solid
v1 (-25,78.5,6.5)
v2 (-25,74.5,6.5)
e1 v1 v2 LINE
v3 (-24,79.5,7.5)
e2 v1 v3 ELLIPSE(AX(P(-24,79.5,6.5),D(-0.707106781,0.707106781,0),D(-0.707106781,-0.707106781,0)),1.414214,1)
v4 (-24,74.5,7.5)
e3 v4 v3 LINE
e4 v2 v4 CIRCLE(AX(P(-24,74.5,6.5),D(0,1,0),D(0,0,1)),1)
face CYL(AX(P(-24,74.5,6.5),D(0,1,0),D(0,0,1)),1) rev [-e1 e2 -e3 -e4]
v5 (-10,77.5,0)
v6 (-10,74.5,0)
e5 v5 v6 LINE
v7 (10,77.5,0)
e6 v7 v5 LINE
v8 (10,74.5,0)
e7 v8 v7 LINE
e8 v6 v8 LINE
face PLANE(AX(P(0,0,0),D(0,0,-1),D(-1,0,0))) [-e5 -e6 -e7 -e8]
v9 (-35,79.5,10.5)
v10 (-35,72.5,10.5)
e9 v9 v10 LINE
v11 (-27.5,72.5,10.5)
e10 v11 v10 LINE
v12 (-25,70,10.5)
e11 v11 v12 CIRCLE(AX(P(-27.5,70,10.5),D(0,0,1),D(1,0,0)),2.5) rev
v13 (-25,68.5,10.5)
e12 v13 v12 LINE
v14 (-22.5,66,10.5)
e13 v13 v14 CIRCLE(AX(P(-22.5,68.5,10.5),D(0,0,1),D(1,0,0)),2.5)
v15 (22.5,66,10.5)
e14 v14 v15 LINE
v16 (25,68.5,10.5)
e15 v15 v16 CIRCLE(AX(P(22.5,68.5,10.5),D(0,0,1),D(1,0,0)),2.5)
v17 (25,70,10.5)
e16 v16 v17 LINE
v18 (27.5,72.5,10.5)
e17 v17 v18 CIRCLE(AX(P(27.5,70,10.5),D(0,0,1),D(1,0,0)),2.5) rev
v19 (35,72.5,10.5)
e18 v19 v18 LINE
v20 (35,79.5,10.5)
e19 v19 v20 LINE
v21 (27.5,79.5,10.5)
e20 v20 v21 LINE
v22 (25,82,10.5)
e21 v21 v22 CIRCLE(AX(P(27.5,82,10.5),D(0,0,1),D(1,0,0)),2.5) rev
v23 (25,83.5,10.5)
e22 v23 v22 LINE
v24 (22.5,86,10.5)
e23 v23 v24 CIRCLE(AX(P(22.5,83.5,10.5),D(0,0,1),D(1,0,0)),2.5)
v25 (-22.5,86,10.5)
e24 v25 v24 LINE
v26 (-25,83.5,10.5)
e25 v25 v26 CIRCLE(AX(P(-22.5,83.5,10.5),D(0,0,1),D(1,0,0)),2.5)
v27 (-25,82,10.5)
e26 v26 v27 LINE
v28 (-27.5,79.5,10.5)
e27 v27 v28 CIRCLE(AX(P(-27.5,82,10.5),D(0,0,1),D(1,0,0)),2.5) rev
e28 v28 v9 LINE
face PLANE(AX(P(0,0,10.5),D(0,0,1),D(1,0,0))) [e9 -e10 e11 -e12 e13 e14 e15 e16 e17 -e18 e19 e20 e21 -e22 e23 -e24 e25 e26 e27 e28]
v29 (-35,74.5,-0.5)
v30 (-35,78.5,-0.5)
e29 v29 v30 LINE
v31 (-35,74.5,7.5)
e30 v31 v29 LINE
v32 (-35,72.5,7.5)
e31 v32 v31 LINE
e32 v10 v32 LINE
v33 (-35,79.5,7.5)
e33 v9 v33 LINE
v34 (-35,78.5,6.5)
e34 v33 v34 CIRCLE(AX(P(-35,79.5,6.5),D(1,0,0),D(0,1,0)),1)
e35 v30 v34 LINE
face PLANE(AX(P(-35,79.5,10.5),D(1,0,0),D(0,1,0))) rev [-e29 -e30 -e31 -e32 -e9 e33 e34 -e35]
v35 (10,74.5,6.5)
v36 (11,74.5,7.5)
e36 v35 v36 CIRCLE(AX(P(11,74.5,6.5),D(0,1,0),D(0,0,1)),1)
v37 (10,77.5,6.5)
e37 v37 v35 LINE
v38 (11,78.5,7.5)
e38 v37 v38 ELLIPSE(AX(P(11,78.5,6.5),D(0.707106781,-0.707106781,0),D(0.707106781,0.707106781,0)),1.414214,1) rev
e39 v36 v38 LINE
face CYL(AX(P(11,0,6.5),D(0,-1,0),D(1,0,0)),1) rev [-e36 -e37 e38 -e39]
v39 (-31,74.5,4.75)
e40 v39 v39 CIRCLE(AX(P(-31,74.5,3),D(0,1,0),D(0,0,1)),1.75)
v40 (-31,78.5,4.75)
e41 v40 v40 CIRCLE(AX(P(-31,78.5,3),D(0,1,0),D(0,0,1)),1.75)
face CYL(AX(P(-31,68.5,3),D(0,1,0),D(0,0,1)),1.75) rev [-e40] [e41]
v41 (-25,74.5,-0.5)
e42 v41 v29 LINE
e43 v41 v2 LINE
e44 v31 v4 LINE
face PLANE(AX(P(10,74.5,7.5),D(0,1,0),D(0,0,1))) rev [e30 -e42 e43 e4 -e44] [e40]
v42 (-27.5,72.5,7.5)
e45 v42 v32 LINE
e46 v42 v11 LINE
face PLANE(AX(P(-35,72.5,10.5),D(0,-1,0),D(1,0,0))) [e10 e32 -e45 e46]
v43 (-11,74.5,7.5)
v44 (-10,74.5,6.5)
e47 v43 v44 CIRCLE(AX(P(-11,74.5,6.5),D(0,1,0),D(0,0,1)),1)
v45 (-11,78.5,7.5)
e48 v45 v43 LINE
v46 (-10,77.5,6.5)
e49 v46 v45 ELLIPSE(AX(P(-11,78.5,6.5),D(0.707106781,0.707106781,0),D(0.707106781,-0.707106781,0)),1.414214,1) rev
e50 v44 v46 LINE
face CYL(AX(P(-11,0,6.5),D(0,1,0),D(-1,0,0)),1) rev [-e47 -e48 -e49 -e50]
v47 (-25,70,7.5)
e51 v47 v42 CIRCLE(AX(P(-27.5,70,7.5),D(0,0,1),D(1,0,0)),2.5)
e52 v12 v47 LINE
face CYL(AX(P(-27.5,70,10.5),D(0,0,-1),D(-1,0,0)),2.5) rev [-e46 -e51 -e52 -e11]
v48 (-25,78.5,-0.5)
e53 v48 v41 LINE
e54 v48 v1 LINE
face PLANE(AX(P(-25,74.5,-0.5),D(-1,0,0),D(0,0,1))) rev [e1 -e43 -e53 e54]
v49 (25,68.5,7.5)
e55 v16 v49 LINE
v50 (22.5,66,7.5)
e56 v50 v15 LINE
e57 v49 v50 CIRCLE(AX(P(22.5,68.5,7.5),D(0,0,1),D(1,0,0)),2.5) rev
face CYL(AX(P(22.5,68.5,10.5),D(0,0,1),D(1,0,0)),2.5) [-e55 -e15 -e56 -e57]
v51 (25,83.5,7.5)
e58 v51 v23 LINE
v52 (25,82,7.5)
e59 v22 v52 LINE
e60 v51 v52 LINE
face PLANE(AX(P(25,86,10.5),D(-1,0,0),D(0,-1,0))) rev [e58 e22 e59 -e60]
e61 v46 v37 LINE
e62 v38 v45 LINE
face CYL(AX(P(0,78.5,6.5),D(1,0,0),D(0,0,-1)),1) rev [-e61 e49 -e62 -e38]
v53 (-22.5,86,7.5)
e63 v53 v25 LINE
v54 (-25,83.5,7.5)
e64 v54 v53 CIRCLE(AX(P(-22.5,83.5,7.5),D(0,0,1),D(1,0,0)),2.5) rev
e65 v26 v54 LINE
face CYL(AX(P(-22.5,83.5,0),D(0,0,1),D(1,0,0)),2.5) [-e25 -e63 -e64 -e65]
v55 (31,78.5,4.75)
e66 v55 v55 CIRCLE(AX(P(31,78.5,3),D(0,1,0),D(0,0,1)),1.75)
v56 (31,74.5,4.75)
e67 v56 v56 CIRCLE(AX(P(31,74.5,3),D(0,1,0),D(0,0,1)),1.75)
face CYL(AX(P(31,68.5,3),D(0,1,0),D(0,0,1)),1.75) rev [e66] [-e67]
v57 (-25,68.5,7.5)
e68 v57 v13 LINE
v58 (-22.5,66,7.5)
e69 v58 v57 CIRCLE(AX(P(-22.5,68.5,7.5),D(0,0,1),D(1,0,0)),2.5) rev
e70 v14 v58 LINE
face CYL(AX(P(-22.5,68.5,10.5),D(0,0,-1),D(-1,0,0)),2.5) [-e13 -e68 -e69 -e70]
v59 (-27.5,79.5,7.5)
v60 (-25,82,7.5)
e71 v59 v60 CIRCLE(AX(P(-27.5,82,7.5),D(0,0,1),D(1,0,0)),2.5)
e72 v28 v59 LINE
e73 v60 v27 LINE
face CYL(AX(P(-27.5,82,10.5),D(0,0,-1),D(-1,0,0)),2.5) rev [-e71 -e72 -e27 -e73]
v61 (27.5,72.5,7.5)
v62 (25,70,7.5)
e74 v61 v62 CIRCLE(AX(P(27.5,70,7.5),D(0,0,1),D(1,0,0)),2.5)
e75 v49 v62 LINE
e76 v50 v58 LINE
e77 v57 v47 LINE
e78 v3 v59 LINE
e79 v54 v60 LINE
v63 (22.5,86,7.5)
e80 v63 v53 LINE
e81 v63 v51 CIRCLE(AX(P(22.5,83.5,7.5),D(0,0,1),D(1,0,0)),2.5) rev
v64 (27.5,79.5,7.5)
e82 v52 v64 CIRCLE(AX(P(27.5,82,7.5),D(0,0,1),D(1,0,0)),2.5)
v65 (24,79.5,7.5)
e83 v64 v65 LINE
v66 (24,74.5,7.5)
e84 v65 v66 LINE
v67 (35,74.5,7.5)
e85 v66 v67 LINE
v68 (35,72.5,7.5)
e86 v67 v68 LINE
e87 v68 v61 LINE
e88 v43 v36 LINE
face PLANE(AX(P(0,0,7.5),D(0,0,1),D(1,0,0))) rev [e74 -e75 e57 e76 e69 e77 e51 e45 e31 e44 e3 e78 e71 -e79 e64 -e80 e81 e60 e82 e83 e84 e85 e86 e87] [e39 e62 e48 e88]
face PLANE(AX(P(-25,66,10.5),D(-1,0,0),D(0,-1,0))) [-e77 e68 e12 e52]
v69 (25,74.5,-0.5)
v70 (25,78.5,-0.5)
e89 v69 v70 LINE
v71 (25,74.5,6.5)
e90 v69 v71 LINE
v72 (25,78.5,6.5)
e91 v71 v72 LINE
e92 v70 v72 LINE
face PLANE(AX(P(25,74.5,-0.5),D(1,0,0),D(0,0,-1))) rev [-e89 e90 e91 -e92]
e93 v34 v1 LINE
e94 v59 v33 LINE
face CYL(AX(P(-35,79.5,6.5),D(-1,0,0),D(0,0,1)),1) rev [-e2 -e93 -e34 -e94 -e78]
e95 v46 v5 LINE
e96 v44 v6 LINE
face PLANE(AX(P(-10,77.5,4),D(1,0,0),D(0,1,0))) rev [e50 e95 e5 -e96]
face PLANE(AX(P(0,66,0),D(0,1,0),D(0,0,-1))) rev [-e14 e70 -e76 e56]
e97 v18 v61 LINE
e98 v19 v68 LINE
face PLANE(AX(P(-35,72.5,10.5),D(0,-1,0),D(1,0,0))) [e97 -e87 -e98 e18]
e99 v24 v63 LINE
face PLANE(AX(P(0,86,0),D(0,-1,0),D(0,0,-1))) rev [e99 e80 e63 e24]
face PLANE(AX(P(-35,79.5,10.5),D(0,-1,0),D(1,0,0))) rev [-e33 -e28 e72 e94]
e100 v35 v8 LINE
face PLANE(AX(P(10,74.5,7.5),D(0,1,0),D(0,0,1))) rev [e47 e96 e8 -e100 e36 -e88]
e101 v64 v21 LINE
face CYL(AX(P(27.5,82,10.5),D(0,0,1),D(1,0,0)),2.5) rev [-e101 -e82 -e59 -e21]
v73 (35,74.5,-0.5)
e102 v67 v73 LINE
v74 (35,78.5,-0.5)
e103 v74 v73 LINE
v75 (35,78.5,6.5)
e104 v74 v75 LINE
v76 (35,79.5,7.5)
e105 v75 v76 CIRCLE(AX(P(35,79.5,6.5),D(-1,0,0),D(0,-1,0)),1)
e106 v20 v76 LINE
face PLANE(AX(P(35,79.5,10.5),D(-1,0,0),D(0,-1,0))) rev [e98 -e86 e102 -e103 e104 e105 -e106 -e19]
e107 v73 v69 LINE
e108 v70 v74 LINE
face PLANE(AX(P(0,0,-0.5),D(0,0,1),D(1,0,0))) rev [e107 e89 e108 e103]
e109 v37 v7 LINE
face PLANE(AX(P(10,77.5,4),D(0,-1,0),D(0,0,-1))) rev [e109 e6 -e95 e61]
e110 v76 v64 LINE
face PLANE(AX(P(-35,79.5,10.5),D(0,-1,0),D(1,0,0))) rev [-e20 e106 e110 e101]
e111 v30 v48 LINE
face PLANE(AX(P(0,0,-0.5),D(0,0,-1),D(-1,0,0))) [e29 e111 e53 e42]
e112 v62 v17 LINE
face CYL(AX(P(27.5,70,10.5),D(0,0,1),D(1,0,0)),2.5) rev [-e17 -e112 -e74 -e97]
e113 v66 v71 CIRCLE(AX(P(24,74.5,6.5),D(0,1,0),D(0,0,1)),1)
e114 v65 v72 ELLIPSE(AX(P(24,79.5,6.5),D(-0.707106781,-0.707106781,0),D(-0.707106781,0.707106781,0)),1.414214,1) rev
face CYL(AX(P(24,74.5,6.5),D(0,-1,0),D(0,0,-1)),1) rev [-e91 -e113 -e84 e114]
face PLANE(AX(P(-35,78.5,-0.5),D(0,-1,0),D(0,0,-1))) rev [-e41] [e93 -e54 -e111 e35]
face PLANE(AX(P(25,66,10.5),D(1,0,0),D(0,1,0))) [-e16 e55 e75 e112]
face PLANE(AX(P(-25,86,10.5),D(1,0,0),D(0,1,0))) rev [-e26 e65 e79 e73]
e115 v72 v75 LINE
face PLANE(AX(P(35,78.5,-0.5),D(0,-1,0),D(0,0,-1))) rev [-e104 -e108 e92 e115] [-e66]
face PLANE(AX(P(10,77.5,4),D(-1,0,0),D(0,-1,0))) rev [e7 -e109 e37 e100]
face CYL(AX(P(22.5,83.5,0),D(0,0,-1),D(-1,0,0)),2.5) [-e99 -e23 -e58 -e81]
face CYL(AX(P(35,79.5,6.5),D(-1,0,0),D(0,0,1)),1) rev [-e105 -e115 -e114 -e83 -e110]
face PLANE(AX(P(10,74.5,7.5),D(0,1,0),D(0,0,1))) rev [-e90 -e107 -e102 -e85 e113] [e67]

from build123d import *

# Parameters (mm, degrees)
SKETCH1_W           = 20
SKETCH1_H           = 155
BOSS_EXTRUDE1_DEPTH = 4
SKETCH2_W           = 20
SKETCH2_H           = 4
BOSS_EXTRUDE3_DEPTH = 50
RIB2_REACH          = 96.986
SKETCH7_WALL_W      = 290.205463948
SKETCH7_WALL_H      = 4
SKETCH8_W           = 20
SKETCH8_H           = 3
BOSS_EXTRUDE4_DEPTH = 3.5
SKETCH9_W           = 70
SKETCH9_H           = 5
BOSS_EXTRUDE6_DEPTH = 3
SKETCH10_W          = 10
SKETCH10_H          = 4
BOSS_EXTRUDE7_DEPTH = 8
SKETCH12_R          = 1.75
CUT_EXTRUDE1_DEPTH  = 10
SKETCH13_W          = 111.319070758
SKETCH13_H          = 99.743885808
CUT_EXTRUDE2_DEPTH  = 152
SKETCH14_W          = 50
SKETCH14_H          = 3
BOSS_EXTRUDE8_DEPTH = 6.5
FILLET1_R           = 1
FILLET2_R           = 2.5


with BuildPart() as part:
    # Sketch1 → Boss-Extrude1 (new body)
    with BuildSketch(Plane.XY):
        Rectangle(SKETCH1_W, SKETCH1_H)
    extrude(amount=BOSS_EXTRUDE1_DEPTH)

    # Sketch2 → Boss-Extrude3 (add)
    with BuildSketch(Plane.XY.offset(4)):
        with Locations((0, -75.5)):
            Rectangle(SKETCH2_W, SKETCH2_H)
    extrude(amount=BOSS_EXTRUDE3_DEPTH)

    # Sketch7 wall → Rib2 (add, up to next)
    with BuildSketch(Plane(origin=(0, -26, 16.5), x_dir=(0, 0.967074537263, -0.25449329928), z_dir=(0, 0.25449329928, 0.967074537263)), mode=Mode.PRIVATE) as rib2_sk1:
        Rectangle(SKETCH7_WALL_W, SKETCH7_WALL_H)
    rib2_tool1 = extrude(rib2_sk1.sketch, amount=-RIB2_REACH, mode=Mode.PRIVATE) - part.part
    add(rib2_tool1.solids().sort_by_distance((0, -26, 16.5))[0])

    # Sketch8 → Boss-Extrude4 (add)
    with BuildSketch(Plane.XY.offset(4)):
        with Locations((0, 76)):
            Rectangle(SKETCH8_W, SKETCH8_H)
    extrude(amount=BOSS_EXTRUDE4_DEPTH)

    # Sketch9 → Boss-Extrude6 (add)
    with BuildSketch(Plane.XY.offset(7.5)):
        with Locations((0, 77)):
            Rectangle(SKETCH9_W, SKETCH9_H)
    boss_extrude6 = extrude(amount=BOSS_EXTRUDE6_DEPTH)

    # Sketch10 → Boss-Extrude7 (add)
    with BuildSketch(Plane(origin=(0, 0, 7.5), x_dir=(-1, 0, 0), z_dir=(0, 0, -1))):
        with Locations((30, 76.5)):
            Rectangle(SKETCH10_W, SKETCH10_H)
        with Locations((-30, 76.5)):
            Rectangle(SKETCH10_W, SKETCH10_H)
    extrude(amount=BOSS_EXTRUDE7_DEPTH)

    # Sketch12 → Cut-Extrude1 (cut)
    with BuildSketch(Plane(origin=(0, 78.5, 0), x_dir=(1, 0, 0), z_dir=(0, 1, 0))):
        with Locations(Location((-31, -3, 0), (0, 0, 270))):
            Circle(SKETCH12_R)
        with Locations(Location((31, -3, 0), (0, 0, 270))):
            Circle(SKETCH12_R)
    extrude(amount=-CUT_EXTRUDE1_DEPTH, mode=Mode.SUBTRACT)

    # Sketch13 → Cut-Extrude2 (cut)
    with BuildSketch(Plane.XZ.offset(77.5)):
        with Locations((2.652852139, 20.474703111)):
            Rectangle(SKETCH13_W, SKETCH13_H)
    extrude(amount=-CUT_EXTRUDE2_DEPTH, mode=Mode.SUBTRACT)

    # Sketch14 → Boss-Extrude8 (add)
    with BuildSketch(Plane(origin=(0, 79.5, 0), x_dir=(1, 0, 0), z_dir=(0, 1, 0))):
        with Locations((0, -9)):
            Rectangle(SKETCH14_W, SKETCH14_H)
    boss_extrude8 = extrude(amount=BOSS_EXTRUDE8_DEPTH)

    # Mirror1: Boss-Extrude6, Boss-Extrude8 across plane
    add(boss_extrude6.mirror(Plane(origin=(0, 76, 0), x_dir=(0, 0, 1), z_dir=(0, -1, 0))))
    add(boss_extrude8.mirror(Plane(origin=(0, 76, 0), x_dir=(0, 0, 1), z_dir=(0, -1, 0))))

    # Fillet1
    fillet1_edges = [part.edges().sort_by_distance(p)[0] for p in [
        (10, 76, 7.5),
        (0, 77.5, 7.5),
        (-10, 76, 7.5),
        (-30, 78.5, 7.5),
        (-25, 76.5, 7.5),
        (25, 76.5, 7.5),
        (30, 78.5, 7.5),
    ]]
    fillet(fillet1_edges, radius=FILLET1_R - 0.0001)  # a hair under: the kernel refuses the full size

    # Fillet2
    fillet2_edges = [part.edges().sort_by_distance(p)[0] for p in [
        (-25, 79.5, 9),
        (25, 79.5, 9),
        (-25, 86, 9),
        (25, 86, 9),
        (-25, 66, 9),
        (25, 66, 9),
        (-25, 72.5, 9),
        (25, 72.5, 9),
    ]]
    fillet(fillet2_edges, radius=FILLET2_R)


solid = part.part
